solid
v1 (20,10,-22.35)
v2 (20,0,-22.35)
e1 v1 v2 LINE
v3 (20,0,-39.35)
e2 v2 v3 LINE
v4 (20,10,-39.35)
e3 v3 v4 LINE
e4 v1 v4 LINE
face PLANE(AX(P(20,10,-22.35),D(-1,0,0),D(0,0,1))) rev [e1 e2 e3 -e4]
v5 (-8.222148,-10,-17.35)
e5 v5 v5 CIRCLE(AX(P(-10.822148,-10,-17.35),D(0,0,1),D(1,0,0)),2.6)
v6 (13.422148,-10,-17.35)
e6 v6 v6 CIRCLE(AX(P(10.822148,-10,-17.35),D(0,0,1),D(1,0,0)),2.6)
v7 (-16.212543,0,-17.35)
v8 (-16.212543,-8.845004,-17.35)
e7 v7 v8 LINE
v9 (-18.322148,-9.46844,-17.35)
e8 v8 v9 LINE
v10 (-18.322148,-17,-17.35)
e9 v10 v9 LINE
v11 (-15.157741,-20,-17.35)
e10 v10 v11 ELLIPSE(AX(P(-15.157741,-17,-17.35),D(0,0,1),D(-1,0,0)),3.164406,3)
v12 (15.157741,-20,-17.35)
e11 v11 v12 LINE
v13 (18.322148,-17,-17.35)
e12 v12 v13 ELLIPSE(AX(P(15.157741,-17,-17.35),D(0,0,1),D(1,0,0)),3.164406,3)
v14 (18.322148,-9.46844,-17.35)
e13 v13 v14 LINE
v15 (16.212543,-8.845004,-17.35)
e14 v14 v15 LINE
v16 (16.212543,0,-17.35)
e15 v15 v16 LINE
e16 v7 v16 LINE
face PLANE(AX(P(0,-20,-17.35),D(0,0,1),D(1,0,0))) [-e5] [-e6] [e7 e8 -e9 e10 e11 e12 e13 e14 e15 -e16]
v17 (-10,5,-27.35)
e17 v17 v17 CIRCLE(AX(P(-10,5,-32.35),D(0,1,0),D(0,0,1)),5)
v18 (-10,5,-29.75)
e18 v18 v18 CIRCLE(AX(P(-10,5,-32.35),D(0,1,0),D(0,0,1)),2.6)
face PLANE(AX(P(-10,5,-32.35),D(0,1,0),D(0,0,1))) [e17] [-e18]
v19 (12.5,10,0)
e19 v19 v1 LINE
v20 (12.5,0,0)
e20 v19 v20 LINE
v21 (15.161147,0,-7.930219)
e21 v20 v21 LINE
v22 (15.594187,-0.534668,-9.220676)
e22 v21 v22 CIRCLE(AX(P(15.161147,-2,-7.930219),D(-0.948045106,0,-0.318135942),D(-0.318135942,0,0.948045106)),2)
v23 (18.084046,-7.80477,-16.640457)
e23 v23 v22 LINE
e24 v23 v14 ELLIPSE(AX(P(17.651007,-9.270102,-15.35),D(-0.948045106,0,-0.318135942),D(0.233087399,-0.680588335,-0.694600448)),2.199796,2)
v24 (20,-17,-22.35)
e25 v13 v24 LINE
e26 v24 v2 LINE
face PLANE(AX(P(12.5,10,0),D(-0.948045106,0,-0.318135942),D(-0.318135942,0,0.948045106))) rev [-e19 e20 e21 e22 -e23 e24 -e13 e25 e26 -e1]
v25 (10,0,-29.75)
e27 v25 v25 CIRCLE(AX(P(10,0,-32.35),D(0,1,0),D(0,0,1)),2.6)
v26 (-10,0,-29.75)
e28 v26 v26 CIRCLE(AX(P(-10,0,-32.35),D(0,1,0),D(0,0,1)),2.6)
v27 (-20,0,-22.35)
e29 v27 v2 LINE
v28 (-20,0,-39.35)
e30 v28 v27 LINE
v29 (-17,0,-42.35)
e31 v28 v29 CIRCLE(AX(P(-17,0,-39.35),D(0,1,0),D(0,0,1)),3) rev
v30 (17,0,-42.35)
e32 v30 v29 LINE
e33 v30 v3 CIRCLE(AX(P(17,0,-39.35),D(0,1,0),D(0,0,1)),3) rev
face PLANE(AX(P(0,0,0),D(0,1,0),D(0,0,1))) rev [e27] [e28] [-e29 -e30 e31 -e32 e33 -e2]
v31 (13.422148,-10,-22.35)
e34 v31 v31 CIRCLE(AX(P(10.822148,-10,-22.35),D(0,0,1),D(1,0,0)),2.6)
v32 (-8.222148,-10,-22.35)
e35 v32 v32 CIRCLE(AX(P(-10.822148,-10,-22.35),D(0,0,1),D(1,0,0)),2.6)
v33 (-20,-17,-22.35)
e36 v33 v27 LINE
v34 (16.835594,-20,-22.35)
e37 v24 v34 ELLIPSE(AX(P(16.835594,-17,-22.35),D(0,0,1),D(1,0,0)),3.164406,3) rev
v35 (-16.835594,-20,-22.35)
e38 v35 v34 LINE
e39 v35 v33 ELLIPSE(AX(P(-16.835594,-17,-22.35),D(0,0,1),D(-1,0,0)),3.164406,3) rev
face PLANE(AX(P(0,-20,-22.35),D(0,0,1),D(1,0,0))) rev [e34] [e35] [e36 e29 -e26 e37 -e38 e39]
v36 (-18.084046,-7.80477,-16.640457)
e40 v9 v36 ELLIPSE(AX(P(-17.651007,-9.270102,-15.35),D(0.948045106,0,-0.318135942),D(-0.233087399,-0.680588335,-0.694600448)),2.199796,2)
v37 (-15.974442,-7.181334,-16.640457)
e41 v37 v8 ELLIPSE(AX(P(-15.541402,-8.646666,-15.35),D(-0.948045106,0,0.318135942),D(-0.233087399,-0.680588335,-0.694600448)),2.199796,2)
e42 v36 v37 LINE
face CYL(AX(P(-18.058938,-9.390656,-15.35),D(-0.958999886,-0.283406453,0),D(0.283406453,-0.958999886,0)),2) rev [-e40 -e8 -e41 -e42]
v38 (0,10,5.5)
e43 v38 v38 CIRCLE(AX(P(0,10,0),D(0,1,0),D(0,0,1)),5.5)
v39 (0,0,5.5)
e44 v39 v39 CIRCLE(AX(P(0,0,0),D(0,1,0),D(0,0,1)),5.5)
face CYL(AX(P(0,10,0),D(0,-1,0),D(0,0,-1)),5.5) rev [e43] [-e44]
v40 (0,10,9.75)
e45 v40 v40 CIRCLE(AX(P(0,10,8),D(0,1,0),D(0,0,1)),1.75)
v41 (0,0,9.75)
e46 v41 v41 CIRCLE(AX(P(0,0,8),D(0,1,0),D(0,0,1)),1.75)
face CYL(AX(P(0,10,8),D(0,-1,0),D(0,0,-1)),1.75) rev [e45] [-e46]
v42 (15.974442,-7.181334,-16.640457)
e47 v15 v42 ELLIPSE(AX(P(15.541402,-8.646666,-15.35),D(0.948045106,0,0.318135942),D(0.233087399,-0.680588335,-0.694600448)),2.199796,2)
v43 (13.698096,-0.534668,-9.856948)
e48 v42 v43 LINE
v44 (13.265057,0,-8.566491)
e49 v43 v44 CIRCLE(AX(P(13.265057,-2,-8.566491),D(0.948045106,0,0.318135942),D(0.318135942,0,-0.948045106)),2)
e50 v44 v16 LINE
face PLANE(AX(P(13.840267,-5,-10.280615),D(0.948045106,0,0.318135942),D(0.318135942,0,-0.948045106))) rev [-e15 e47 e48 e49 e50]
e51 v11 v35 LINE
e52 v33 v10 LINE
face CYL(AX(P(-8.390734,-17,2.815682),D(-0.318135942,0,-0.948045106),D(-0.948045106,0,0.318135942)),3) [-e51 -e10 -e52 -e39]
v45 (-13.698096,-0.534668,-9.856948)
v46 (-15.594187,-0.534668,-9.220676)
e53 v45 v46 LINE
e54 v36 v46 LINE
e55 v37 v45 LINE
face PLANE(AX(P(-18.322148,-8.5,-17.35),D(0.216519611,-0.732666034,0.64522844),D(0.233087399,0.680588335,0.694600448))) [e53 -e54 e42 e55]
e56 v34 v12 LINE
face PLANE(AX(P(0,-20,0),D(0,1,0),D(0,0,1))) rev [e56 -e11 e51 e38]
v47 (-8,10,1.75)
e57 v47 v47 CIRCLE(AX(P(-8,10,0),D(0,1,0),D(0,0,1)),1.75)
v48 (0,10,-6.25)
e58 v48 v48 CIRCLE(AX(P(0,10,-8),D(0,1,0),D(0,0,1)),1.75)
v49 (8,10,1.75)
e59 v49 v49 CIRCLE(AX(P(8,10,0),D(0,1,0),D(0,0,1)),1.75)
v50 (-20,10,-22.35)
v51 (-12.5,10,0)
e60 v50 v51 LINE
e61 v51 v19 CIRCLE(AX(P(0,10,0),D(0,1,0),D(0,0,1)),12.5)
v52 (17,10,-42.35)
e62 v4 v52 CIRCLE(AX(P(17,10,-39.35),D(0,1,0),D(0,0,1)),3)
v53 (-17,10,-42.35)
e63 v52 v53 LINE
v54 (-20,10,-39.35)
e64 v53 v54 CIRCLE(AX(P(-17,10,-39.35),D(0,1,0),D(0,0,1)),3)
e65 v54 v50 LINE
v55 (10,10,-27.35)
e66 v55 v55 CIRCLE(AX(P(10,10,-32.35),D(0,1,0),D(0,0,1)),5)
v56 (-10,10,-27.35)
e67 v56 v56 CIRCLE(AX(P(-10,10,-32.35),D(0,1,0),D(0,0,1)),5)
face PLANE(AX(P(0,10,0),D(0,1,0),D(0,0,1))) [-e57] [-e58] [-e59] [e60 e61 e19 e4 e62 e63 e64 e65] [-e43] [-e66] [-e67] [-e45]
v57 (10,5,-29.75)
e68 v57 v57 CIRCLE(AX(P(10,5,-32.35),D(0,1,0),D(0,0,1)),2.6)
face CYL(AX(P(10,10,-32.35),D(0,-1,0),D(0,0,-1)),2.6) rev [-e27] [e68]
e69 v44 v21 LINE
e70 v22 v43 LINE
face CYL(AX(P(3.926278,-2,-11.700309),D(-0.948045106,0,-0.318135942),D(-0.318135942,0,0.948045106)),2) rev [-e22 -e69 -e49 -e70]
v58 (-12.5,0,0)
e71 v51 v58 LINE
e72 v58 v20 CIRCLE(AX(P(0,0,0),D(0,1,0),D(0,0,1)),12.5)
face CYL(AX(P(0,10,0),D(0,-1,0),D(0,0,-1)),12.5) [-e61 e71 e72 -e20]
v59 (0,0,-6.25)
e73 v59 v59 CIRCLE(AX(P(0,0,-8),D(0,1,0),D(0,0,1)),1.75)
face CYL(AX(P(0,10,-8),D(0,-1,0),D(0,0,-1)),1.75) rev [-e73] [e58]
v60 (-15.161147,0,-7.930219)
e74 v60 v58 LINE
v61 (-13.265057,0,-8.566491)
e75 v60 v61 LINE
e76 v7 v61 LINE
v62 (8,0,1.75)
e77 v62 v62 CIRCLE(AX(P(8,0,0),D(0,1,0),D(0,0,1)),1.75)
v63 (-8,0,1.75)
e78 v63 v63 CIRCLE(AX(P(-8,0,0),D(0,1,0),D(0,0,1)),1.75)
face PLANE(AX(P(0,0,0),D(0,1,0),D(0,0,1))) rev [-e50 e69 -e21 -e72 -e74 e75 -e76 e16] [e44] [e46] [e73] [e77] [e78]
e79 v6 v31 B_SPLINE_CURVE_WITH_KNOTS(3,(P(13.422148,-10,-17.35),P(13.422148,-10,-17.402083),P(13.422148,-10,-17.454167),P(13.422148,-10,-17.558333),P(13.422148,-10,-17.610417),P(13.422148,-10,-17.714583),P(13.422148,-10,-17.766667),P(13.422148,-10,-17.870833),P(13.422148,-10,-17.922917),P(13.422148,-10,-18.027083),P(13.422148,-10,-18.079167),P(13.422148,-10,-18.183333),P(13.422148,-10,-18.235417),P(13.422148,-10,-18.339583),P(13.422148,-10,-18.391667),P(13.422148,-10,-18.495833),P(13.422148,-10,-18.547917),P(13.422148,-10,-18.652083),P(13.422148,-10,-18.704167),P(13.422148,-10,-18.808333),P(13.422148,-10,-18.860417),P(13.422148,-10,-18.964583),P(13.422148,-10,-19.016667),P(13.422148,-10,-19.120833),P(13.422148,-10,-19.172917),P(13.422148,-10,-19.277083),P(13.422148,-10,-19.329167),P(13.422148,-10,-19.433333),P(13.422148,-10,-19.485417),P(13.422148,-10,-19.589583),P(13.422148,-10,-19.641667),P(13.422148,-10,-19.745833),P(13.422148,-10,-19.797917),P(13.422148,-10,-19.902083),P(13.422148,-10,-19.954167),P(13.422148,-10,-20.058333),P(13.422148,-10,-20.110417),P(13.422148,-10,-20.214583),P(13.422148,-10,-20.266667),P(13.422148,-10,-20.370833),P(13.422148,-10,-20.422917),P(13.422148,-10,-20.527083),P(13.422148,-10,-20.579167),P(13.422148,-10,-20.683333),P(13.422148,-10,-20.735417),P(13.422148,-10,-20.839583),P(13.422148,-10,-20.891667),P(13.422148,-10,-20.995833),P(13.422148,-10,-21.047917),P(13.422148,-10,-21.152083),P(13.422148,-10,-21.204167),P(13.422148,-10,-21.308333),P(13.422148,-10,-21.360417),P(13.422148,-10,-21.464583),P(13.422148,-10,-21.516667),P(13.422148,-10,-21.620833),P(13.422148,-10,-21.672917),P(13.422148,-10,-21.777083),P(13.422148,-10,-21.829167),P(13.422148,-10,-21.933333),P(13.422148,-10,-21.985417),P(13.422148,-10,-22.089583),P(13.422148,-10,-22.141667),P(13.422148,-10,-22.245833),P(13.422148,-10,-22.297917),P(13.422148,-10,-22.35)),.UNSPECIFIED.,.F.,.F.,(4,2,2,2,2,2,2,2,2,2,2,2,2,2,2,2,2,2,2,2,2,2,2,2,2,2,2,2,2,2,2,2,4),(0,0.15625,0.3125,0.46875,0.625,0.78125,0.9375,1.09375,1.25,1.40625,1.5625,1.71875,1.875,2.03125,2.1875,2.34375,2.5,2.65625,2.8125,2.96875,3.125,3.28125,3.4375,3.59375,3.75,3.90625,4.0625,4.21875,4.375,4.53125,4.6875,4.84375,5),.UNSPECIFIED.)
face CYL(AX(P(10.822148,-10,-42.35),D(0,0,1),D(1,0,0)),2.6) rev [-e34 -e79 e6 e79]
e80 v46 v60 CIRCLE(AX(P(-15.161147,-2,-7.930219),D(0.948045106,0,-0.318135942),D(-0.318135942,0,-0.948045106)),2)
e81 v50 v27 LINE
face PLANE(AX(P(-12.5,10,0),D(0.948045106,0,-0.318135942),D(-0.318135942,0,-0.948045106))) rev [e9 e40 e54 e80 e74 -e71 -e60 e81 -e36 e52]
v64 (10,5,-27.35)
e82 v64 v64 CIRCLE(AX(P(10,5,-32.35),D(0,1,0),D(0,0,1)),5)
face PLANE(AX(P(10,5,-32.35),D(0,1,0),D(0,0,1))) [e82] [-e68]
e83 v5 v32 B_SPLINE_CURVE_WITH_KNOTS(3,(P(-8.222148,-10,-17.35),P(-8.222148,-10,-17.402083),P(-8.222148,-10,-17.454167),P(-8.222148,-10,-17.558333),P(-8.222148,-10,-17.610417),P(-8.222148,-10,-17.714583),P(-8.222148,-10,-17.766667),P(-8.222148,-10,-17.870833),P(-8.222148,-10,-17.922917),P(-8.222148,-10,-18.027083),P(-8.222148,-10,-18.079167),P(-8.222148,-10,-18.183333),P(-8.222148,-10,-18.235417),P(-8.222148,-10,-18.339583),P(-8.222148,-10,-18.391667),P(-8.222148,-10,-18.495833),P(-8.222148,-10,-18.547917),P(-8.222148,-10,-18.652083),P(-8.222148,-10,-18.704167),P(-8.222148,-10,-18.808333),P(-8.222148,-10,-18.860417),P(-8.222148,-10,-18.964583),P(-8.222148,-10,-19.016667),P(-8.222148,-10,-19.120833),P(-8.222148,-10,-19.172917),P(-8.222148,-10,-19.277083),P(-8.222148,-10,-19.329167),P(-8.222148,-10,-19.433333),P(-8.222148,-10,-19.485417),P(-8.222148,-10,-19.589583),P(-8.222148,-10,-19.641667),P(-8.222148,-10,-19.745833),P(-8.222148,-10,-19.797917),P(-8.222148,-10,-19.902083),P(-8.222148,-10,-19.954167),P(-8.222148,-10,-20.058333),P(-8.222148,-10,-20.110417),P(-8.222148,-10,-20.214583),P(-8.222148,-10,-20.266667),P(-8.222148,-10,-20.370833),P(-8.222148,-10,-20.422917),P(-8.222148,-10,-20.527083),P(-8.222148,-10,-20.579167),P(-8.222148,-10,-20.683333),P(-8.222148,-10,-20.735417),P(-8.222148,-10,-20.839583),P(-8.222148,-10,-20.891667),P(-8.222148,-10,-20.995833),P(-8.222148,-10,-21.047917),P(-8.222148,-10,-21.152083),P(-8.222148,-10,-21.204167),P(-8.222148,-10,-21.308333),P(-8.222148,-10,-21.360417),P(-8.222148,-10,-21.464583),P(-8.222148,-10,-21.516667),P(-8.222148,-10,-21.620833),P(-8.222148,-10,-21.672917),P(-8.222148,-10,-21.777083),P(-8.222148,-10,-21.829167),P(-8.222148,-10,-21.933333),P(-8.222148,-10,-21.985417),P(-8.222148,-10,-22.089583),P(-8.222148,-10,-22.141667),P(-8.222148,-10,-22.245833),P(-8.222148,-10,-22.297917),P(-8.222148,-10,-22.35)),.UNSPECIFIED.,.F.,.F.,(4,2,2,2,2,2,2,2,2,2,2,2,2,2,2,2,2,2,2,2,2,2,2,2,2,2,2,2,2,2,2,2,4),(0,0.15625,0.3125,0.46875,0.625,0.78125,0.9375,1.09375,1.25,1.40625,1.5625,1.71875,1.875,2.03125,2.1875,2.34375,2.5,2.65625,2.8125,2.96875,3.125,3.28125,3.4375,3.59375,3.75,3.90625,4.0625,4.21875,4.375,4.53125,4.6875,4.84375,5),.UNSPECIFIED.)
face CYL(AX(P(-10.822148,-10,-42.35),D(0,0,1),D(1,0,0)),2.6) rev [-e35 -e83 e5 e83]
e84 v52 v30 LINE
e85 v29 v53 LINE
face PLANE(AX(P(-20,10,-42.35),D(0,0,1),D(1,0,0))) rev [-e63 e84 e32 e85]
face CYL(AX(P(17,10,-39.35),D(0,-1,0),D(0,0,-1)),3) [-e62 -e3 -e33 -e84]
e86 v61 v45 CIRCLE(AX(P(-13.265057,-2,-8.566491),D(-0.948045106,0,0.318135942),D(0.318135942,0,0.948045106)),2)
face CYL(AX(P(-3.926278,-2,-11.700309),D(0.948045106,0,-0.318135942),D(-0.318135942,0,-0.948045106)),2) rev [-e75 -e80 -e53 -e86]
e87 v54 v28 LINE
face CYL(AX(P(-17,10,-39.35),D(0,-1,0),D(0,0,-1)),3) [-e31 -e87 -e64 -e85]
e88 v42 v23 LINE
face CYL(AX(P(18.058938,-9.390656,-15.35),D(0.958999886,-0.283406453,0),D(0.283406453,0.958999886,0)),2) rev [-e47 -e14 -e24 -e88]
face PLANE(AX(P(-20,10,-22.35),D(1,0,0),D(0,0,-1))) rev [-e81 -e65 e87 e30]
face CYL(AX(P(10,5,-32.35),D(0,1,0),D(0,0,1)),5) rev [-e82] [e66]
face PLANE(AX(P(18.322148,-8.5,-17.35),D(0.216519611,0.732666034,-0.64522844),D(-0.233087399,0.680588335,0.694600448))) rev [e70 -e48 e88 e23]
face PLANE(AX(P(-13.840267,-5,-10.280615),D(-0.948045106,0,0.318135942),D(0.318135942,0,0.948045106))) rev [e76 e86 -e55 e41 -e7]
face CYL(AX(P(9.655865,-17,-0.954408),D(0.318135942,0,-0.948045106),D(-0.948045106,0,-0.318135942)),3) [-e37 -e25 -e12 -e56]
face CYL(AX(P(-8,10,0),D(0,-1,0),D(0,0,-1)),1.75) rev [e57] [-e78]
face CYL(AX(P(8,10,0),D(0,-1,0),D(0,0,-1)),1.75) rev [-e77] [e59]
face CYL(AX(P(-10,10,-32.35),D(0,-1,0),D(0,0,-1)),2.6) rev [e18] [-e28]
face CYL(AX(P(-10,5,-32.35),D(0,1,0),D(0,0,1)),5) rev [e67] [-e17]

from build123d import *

# Parameters (mm, degrees)
SKETCH1_R           = 12.5
SKETCH1_R_2         = 5.5
SKETCH1_R_3         = 1.75
BOSS_EXTRUDE1_DEPTH = 10
SKETCH3_R           = 2.6
BOSS_EXTRUDE2_DEPTH = 10
BOSS_EXTRUDE3_DEPTH = 20
SKETCH5_R           = 2.6
CUT_EXTRUDE1_DEPTH  = 42.122043967
FILLET3_R           = 3
FILLET4_R           = 3
RIB1_REACH          = 61.183
SKETCH6_WALL_W      = 132.856077754
SKETCH6_WALL_H      = 2
FILLET6_R           = 2
RIB2_REACH          = 61.183
SKETCH7_WALL_W      = 132.856077754
SKETCH7_WALL_H      = 2
FILLET7_R           = 2
SKETCH8_R           = 5
CUT_EXTRUDE2_DEPTH  = 5


with BuildPart() as part:
    # Sketch1 → Boss-Extrude1 (new body)
    with BuildSketch(Plane(origin=(0, 0, 0), x_dir=(1, 0, 0), z_dir=(0, 1, 0))):
        Circle(SKETCH1_R)
        Circle(SKETCH1_R_2, mode=Mode.SUBTRACT)
        with Locations((0, 8)):
            Circle(SKETCH1_R_3, mode=Mode.SUBTRACT)
        with Locations((8, 0)):
            Circle(SKETCH1_R_3, mode=Mode.SUBTRACT)
        with Locations((0, -8)):
            Circle(SKETCH1_R_3, mode=Mode.SUBTRACT)
        with Locations((-8, 0)):
            Circle(SKETCH1_R_3, mode=Mode.SUBTRACT)
    extrude(amount=BOSS_EXTRUDE1_DEPTH)

    # Sketch3 → Boss-Extrude2 (add)
    with BuildSketch(Plane(origin=(0, 0, 0), x_dir=(1, 0, 0), z_dir=(0, 1, 0))):
        with BuildLine():
            Line((-12.5, 0), (-20, 22.35))
            Line((-20, 22.35), (-20, 42.35))
            Line((-20, 42.35), (20, 42.35))
            Line((20, 42.35), (20, 22.35))
            Line((20, 22.35), (12.5, 0))
            ThreePointArc((12.5, 0), (0, 12.5), (-12.5, 0))
        make_face()
        with Locations((-10, 32.35)):
            Circle(SKETCH3_R, mode=Mode.SUBTRACT)
        with Locations((10, 32.35)):
            Circle(SKETCH3_R, mode=Mode.SUBTRACT)
    extrude(amount=BOSS_EXTRUDE2_DEPTH)

    # Sketch4 → Boss-Extrude3 (add)
    with BuildSketch(Plane(origin=(0, 0, 0), x_dir=(1, 0, 0), z_dir=(0, 1, 0))):
        Polygon((20, 22.35), (-20, 22.35), (-18.322147651, 17.35), (18.322147651, 17.35), align=None)
    extrude(amount=-BOSS_EXTRUDE3_DEPTH)

    # Sketch5 → Cut-Extrude1 (cut, through all)
    with BuildSketch(Plane.XY.offset(-17.35)):
        with Locations((-10.822147651, -10)):
            Circle(SKETCH5_R)
        with Locations((10.822147651, -10)):
            Circle(SKETCH5_R)
    extrude(amount=-CUT_EXTRUDE1_DEPTH, mode=Mode.SUBTRACT)

    # Fillet3
    fillet3_edges = [part.edges().sort_by_distance(p)[0] for p in [
        (19.161073826, -20, -19.85),
        (-19.161073826, -20, -19.85),
    ]]
    fillet(fillet3_edges, radius=FILLET3_R)

    # Fillet4
    fillet4_edges = [part.edges().sort_by_distance(p)[0] for p in [
        (20, 5, -42.35),
        (-20, 5, -42.35),
    ]]
    fillet(fillet4_edges, radius=FILLET4_R)

    # Sketch6 wall → Rib1 (add, up to next)
    with BuildSketch(Plane(origin=(-16.866610739, -4.25, -13.0125), x_dir=(0.233087398642, 0.680588335288, 0.694600448074), z_dir=(-0.216519610858, 0.732666034336, -0.645228440356)), mode=Mode.PRIVATE) as rib1_sk1:
        with Locations((0, 1)):
            Rectangle(SKETCH6_WALL_W, SKETCH6_WALL_H)
    rib1_tool1 = extrude(rib1_sk1.sketch, amount=RIB1_REACH, mode=Mode.PRIVATE) - part.part
    add(rib1_tool1.solids().sort_by_distance((-16.866610739, -4.25, -13.0125))[0])

    # Fillet6
    fillet6_edges = [part.edges().sort_by_distance(p)[0] for p in [
        (-17.267345518, -8.188281786, -17.35),
        (-14.463028721, 0, -8.993135942),
    ]]
    fillet(fillet6_edges, radius=FILLET6_R)

    # Sketch7 wall → Rib2 (add, up to next)
    with BuildSketch(Plane(origin=(16.866610739, -4.25, -13.0125), x_dir=(-0.233087398642, 0.680588335288, 0.694600448074), z_dir=(-0.216519610858, -0.732666034336, 0.645228440356)), mode=Mode.PRIVATE) as rib2_sk1:
        with Locations((0, 1)):
            Rectangle(SKETCH7_WALL_W, SKETCH7_WALL_H)
    rib2_tool1 = extrude(rib2_sk1.sketch, amount=-RIB2_REACH, mode=Mode.PRIVATE) - part.part
    add(rib2_tool1.solids().sort_by_distance((16.866610739, -4.25, -13.0125))[0])

    # Fillet7
    fillet7_edges = [part.edges().sort_by_distance(p)[0] for p in [
        (17.267345518, -8.188281786, -17.35),
        (14.463028721, 0, -8.993135942),
    ]]
    fillet(fillet7_edges, radius=FILLET7_R)

    # Sketch8 → Cut-Extrude2 (cut)
    with BuildSketch(Plane(origin=(0, 10, 0), x_dir=(1, 0, 0), z_dir=(0, 1, 0))):
        with Locations((-10, 32.35)):
            Circle(SKETCH8_R)
        with Locations((10, 32.35)):
            Circle(SKETCH8_R)
    extrude(amount=-CUT_EXTRUDE2_DEPTH, mode=Mode.SUBTRACT)


solid = part.part
